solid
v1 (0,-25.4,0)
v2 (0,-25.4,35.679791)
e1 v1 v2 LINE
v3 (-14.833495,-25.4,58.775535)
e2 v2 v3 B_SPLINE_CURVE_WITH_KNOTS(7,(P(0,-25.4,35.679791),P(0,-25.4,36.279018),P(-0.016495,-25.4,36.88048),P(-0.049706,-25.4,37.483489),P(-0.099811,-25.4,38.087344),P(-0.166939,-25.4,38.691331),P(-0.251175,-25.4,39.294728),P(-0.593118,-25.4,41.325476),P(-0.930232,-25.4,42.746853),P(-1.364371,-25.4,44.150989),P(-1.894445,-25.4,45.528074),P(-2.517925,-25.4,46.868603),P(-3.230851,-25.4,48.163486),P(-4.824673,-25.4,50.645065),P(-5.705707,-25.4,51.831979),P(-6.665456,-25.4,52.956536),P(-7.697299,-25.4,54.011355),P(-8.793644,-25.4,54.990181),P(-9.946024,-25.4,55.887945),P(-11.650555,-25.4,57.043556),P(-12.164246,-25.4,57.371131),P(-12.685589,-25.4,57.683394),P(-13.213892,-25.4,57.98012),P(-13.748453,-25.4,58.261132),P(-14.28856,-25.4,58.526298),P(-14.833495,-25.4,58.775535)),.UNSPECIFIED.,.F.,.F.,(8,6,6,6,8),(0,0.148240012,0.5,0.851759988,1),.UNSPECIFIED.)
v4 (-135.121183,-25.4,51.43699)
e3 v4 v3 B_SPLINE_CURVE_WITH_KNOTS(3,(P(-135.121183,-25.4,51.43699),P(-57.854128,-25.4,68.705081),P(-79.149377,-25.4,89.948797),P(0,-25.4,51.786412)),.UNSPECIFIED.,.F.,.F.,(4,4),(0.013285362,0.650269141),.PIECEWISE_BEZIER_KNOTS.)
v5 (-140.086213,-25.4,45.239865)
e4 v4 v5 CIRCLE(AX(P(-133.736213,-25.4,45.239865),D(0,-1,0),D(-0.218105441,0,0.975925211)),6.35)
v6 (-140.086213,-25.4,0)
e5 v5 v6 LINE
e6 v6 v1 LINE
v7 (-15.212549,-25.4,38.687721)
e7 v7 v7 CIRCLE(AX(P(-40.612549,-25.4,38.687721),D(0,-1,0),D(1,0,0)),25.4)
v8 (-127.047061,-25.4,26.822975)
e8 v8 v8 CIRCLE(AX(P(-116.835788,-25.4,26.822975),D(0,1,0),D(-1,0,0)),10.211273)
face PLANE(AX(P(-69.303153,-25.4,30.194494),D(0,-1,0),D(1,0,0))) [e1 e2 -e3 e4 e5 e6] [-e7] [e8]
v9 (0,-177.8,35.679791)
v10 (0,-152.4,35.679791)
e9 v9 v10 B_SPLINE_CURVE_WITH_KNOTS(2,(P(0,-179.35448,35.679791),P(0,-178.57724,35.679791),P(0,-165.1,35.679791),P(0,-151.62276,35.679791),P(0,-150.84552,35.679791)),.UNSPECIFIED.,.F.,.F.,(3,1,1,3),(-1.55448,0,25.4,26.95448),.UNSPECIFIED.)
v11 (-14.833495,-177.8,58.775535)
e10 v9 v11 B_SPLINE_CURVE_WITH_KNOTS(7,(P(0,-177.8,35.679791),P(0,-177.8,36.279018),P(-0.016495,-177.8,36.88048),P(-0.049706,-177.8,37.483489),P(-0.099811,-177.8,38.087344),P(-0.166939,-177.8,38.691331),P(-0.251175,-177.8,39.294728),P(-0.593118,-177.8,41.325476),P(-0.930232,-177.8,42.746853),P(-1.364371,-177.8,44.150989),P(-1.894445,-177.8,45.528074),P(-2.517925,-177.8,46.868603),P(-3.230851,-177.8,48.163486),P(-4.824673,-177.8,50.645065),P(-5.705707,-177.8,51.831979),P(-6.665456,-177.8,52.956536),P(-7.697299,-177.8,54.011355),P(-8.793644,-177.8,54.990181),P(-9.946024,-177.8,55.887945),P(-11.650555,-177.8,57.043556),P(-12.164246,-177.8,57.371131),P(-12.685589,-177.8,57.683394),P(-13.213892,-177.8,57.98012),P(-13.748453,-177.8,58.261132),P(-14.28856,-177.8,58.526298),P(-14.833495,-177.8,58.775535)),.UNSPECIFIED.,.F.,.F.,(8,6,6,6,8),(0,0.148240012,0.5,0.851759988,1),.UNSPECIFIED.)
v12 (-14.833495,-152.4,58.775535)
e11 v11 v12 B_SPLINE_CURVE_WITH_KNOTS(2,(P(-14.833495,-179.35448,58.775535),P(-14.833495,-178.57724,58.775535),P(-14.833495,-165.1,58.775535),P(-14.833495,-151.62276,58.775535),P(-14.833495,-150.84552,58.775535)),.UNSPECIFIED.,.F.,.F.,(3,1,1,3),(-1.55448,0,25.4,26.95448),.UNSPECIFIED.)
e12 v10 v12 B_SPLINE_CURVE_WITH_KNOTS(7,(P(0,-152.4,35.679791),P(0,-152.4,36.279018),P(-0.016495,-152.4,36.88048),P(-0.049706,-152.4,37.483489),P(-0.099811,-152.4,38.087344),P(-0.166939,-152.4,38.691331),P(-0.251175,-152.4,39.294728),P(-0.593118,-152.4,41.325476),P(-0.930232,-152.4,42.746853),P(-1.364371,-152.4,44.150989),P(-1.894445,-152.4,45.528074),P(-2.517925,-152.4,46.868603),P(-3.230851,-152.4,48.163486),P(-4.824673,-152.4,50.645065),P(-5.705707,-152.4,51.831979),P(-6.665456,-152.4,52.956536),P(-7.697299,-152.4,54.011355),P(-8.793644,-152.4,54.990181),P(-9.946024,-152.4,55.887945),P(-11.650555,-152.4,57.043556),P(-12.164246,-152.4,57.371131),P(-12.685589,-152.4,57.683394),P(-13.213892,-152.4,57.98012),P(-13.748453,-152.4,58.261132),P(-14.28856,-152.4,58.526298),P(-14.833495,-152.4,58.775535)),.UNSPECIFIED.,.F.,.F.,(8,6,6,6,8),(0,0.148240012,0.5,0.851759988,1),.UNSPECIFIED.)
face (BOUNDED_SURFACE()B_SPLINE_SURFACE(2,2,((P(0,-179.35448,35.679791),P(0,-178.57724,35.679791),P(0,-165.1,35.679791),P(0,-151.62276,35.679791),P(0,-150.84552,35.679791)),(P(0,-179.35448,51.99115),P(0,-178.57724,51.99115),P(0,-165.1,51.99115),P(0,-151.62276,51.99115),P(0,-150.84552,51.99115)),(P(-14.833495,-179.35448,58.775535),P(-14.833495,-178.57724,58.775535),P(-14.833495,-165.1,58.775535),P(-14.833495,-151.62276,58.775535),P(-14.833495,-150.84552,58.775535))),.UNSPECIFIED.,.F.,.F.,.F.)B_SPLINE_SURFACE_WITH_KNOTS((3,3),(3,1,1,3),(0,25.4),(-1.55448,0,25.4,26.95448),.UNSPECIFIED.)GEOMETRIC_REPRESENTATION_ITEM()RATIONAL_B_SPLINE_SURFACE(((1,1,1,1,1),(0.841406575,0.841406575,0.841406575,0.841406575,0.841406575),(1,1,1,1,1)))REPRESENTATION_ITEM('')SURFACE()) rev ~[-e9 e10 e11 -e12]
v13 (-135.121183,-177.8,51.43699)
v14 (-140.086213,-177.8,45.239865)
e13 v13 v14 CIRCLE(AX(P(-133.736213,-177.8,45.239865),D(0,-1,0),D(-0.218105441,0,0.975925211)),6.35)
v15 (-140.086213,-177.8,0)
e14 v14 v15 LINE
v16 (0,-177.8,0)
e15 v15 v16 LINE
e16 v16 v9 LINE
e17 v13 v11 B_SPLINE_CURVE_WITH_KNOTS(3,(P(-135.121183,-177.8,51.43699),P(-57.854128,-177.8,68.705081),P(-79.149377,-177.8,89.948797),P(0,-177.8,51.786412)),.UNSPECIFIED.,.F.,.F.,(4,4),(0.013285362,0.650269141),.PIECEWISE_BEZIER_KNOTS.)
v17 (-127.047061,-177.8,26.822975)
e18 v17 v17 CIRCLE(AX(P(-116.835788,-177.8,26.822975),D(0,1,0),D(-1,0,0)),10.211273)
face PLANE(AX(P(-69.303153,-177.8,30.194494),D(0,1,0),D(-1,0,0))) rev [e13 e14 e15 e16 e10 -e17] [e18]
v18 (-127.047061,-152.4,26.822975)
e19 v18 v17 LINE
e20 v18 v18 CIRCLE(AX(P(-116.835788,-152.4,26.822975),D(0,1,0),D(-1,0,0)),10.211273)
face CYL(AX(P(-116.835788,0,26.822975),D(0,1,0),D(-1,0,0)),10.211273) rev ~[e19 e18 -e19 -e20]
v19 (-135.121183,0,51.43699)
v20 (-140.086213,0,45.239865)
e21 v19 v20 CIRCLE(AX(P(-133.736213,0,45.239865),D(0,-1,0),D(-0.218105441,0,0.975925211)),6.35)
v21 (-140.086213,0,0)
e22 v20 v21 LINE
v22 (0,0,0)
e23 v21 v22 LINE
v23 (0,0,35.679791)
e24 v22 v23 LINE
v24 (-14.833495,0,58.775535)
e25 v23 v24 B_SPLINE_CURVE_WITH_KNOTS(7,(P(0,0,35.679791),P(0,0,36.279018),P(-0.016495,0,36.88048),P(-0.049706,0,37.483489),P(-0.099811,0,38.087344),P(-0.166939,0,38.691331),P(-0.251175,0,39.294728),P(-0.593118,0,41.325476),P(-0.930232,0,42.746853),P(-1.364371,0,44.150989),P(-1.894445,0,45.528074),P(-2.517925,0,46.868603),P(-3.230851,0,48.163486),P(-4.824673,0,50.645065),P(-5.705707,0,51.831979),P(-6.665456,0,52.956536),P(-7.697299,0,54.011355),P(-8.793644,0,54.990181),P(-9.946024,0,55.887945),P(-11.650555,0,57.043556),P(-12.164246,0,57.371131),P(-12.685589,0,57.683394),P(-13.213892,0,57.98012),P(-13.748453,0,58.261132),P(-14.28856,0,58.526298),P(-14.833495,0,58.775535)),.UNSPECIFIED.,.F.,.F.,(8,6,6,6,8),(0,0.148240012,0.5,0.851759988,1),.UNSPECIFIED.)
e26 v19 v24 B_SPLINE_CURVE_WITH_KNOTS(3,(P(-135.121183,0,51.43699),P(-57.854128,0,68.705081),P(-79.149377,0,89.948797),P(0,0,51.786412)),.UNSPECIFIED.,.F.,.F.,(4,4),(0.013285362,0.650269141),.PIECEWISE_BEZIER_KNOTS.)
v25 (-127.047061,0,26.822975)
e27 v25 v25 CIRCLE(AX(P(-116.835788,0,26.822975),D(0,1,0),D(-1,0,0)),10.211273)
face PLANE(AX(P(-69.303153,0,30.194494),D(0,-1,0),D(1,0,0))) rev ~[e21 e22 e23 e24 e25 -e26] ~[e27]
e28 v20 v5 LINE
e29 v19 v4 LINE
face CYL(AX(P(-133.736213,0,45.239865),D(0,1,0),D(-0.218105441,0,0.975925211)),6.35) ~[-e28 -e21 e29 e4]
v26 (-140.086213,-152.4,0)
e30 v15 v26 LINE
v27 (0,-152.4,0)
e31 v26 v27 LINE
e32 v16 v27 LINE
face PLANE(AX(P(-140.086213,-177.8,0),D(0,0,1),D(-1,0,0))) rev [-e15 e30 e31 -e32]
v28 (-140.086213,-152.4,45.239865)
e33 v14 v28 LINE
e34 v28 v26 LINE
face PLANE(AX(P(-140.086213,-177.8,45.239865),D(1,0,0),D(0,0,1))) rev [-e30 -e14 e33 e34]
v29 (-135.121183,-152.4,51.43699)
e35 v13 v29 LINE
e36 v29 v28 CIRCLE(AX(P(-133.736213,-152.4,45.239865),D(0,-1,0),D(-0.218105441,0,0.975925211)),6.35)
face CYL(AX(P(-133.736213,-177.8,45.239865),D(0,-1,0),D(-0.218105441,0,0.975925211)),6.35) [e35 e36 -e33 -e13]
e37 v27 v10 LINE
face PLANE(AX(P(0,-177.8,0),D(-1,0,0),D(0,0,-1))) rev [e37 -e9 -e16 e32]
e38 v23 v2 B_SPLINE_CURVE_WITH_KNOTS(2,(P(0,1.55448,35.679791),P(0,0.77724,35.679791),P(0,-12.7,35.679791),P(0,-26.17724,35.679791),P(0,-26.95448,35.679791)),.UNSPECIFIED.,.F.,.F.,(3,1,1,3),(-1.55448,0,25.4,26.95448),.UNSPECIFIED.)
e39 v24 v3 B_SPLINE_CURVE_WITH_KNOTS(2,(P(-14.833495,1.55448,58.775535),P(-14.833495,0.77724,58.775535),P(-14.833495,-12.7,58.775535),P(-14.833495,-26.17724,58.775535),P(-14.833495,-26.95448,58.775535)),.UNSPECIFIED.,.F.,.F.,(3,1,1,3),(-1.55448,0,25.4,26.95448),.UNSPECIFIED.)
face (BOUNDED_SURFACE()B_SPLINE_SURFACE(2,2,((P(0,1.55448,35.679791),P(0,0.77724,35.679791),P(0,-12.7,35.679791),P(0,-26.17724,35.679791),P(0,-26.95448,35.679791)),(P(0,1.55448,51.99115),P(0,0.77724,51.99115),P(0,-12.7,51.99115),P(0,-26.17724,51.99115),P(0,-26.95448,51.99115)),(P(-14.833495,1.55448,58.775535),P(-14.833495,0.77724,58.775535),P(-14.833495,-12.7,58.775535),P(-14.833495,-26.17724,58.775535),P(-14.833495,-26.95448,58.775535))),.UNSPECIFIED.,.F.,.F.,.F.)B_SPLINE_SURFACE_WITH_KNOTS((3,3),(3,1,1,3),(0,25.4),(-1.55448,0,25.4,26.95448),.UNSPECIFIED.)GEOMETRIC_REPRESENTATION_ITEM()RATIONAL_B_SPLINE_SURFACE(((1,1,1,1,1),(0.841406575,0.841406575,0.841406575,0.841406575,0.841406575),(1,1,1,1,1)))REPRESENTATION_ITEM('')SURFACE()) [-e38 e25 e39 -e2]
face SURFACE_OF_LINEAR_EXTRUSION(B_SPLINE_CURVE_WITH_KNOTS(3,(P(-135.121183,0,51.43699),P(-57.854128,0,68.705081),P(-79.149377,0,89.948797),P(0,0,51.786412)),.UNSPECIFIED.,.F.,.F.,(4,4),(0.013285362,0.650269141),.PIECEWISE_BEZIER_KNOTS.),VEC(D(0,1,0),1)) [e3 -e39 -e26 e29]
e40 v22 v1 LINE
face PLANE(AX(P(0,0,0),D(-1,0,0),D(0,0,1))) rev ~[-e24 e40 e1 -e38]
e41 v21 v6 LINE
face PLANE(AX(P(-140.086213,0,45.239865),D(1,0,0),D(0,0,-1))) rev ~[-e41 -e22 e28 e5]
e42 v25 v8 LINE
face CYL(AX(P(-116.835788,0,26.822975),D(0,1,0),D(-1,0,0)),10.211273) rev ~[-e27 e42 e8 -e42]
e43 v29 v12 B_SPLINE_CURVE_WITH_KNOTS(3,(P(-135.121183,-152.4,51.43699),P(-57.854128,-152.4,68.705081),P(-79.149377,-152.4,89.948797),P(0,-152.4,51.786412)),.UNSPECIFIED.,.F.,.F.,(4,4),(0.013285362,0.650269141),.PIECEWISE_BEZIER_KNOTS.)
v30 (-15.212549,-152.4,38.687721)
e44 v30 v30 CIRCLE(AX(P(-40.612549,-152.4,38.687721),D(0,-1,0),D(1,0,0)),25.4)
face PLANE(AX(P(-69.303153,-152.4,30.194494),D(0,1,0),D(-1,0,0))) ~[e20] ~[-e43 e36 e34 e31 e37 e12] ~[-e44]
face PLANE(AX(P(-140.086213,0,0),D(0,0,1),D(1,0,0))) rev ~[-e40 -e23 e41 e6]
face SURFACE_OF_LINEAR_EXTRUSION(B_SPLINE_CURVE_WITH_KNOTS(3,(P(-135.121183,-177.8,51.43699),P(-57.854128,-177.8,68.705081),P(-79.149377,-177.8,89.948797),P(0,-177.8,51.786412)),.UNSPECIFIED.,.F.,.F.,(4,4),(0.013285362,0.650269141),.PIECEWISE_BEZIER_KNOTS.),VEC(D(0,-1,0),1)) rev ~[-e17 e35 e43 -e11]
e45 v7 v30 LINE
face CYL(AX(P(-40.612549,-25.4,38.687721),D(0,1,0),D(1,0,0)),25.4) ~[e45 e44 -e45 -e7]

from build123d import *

# Parameters (mm, degrees)
F1_DEPTH = 25.4
F2_R     = 25.4
F3_DEPTH = 127
F6_R     = 25.3967781552
F7_R     = 10.211273354
F8_DEPTH = 211.42987


# Not quite as in the source:
# - a feature of the source that left no trace in its solid (it failed there, or was rolled back) is left out
# - a pattern or mirror of a feature is missing from the dataset's text; its kind, count and spacing are read off the source's solid


with BuildPart() as f1:
    # F0 (on Front) → F1 (new body)
    with BuildSketch(Plane.XZ):
        with BuildLine():
            Line((-140.086213054, 0), (0, 0))
            Line((0, 0), (0, 51.7864115536))
            add(Edge.make_bspline(
                [(-135.121182604, 51.4369904306), (-57.8541277154, 68.705081156), (-79.1493766813, 89.948796737), (0, 51.7864115536)],
                knots=[0.0132853618, 0.0132853618, 0.0132853618, 0.0132853618, 0.6502691411, 0.6502691411, 0.6502691411, 0.6502691411], degree=3))
            ThreePointArc((-135.121182604, 51.4369904306), (-138.6918692488, 49.210252186), (-140.086213054, 45.2398653435))
            Line((-140.086213054, 45.2398653435), (-140.086213054, 0))
        make_face()
    extrude(amount=F1_DEPTH)


with BuildPart() as f1_copies_1:
    # F1_copies: instance of F1
    add(f1.part.mirror(Plane(origin=(0, -88.9, 1e-06), x_dir=(0, 0, -1), z_dir=(0, -1, 0))))


with BuildPart() as f1_1:
    add(f1.part)

    add(f1_copies_1.part)  # F3 merges F1_copies_1
    # F2 (on face) → F3 (join)
    with BuildSketch(Plane.XZ.offset(25.4)):
        with Locations((-40.6125485897, 38.6877208911)):
            Circle(F2_R)
    extrude(amount=F3_DEPTH)

    # F6
    f6_edges = [f1_1.edges().sort_by_distance(p)[0] for p in [
        (0, -12.7, 51.786412),
        (0, -165.1, 51.786412),
    ]]
    fillet(f6_edges, radius=F6_R)

    # F7 (on face) → F8 (cut)
    with BuildSketch(Plane(origin=(0, 0, 0), x_dir=(-1, 0, 0), z_dir=(0, 1, 0))):
        with Locations((116.8357878923, 26.8229749054)):
            Circle(F7_R)
    extrude(amount=-F8_DEPTH, mode=Mode.SUBTRACT)


solid = f1_1.part
